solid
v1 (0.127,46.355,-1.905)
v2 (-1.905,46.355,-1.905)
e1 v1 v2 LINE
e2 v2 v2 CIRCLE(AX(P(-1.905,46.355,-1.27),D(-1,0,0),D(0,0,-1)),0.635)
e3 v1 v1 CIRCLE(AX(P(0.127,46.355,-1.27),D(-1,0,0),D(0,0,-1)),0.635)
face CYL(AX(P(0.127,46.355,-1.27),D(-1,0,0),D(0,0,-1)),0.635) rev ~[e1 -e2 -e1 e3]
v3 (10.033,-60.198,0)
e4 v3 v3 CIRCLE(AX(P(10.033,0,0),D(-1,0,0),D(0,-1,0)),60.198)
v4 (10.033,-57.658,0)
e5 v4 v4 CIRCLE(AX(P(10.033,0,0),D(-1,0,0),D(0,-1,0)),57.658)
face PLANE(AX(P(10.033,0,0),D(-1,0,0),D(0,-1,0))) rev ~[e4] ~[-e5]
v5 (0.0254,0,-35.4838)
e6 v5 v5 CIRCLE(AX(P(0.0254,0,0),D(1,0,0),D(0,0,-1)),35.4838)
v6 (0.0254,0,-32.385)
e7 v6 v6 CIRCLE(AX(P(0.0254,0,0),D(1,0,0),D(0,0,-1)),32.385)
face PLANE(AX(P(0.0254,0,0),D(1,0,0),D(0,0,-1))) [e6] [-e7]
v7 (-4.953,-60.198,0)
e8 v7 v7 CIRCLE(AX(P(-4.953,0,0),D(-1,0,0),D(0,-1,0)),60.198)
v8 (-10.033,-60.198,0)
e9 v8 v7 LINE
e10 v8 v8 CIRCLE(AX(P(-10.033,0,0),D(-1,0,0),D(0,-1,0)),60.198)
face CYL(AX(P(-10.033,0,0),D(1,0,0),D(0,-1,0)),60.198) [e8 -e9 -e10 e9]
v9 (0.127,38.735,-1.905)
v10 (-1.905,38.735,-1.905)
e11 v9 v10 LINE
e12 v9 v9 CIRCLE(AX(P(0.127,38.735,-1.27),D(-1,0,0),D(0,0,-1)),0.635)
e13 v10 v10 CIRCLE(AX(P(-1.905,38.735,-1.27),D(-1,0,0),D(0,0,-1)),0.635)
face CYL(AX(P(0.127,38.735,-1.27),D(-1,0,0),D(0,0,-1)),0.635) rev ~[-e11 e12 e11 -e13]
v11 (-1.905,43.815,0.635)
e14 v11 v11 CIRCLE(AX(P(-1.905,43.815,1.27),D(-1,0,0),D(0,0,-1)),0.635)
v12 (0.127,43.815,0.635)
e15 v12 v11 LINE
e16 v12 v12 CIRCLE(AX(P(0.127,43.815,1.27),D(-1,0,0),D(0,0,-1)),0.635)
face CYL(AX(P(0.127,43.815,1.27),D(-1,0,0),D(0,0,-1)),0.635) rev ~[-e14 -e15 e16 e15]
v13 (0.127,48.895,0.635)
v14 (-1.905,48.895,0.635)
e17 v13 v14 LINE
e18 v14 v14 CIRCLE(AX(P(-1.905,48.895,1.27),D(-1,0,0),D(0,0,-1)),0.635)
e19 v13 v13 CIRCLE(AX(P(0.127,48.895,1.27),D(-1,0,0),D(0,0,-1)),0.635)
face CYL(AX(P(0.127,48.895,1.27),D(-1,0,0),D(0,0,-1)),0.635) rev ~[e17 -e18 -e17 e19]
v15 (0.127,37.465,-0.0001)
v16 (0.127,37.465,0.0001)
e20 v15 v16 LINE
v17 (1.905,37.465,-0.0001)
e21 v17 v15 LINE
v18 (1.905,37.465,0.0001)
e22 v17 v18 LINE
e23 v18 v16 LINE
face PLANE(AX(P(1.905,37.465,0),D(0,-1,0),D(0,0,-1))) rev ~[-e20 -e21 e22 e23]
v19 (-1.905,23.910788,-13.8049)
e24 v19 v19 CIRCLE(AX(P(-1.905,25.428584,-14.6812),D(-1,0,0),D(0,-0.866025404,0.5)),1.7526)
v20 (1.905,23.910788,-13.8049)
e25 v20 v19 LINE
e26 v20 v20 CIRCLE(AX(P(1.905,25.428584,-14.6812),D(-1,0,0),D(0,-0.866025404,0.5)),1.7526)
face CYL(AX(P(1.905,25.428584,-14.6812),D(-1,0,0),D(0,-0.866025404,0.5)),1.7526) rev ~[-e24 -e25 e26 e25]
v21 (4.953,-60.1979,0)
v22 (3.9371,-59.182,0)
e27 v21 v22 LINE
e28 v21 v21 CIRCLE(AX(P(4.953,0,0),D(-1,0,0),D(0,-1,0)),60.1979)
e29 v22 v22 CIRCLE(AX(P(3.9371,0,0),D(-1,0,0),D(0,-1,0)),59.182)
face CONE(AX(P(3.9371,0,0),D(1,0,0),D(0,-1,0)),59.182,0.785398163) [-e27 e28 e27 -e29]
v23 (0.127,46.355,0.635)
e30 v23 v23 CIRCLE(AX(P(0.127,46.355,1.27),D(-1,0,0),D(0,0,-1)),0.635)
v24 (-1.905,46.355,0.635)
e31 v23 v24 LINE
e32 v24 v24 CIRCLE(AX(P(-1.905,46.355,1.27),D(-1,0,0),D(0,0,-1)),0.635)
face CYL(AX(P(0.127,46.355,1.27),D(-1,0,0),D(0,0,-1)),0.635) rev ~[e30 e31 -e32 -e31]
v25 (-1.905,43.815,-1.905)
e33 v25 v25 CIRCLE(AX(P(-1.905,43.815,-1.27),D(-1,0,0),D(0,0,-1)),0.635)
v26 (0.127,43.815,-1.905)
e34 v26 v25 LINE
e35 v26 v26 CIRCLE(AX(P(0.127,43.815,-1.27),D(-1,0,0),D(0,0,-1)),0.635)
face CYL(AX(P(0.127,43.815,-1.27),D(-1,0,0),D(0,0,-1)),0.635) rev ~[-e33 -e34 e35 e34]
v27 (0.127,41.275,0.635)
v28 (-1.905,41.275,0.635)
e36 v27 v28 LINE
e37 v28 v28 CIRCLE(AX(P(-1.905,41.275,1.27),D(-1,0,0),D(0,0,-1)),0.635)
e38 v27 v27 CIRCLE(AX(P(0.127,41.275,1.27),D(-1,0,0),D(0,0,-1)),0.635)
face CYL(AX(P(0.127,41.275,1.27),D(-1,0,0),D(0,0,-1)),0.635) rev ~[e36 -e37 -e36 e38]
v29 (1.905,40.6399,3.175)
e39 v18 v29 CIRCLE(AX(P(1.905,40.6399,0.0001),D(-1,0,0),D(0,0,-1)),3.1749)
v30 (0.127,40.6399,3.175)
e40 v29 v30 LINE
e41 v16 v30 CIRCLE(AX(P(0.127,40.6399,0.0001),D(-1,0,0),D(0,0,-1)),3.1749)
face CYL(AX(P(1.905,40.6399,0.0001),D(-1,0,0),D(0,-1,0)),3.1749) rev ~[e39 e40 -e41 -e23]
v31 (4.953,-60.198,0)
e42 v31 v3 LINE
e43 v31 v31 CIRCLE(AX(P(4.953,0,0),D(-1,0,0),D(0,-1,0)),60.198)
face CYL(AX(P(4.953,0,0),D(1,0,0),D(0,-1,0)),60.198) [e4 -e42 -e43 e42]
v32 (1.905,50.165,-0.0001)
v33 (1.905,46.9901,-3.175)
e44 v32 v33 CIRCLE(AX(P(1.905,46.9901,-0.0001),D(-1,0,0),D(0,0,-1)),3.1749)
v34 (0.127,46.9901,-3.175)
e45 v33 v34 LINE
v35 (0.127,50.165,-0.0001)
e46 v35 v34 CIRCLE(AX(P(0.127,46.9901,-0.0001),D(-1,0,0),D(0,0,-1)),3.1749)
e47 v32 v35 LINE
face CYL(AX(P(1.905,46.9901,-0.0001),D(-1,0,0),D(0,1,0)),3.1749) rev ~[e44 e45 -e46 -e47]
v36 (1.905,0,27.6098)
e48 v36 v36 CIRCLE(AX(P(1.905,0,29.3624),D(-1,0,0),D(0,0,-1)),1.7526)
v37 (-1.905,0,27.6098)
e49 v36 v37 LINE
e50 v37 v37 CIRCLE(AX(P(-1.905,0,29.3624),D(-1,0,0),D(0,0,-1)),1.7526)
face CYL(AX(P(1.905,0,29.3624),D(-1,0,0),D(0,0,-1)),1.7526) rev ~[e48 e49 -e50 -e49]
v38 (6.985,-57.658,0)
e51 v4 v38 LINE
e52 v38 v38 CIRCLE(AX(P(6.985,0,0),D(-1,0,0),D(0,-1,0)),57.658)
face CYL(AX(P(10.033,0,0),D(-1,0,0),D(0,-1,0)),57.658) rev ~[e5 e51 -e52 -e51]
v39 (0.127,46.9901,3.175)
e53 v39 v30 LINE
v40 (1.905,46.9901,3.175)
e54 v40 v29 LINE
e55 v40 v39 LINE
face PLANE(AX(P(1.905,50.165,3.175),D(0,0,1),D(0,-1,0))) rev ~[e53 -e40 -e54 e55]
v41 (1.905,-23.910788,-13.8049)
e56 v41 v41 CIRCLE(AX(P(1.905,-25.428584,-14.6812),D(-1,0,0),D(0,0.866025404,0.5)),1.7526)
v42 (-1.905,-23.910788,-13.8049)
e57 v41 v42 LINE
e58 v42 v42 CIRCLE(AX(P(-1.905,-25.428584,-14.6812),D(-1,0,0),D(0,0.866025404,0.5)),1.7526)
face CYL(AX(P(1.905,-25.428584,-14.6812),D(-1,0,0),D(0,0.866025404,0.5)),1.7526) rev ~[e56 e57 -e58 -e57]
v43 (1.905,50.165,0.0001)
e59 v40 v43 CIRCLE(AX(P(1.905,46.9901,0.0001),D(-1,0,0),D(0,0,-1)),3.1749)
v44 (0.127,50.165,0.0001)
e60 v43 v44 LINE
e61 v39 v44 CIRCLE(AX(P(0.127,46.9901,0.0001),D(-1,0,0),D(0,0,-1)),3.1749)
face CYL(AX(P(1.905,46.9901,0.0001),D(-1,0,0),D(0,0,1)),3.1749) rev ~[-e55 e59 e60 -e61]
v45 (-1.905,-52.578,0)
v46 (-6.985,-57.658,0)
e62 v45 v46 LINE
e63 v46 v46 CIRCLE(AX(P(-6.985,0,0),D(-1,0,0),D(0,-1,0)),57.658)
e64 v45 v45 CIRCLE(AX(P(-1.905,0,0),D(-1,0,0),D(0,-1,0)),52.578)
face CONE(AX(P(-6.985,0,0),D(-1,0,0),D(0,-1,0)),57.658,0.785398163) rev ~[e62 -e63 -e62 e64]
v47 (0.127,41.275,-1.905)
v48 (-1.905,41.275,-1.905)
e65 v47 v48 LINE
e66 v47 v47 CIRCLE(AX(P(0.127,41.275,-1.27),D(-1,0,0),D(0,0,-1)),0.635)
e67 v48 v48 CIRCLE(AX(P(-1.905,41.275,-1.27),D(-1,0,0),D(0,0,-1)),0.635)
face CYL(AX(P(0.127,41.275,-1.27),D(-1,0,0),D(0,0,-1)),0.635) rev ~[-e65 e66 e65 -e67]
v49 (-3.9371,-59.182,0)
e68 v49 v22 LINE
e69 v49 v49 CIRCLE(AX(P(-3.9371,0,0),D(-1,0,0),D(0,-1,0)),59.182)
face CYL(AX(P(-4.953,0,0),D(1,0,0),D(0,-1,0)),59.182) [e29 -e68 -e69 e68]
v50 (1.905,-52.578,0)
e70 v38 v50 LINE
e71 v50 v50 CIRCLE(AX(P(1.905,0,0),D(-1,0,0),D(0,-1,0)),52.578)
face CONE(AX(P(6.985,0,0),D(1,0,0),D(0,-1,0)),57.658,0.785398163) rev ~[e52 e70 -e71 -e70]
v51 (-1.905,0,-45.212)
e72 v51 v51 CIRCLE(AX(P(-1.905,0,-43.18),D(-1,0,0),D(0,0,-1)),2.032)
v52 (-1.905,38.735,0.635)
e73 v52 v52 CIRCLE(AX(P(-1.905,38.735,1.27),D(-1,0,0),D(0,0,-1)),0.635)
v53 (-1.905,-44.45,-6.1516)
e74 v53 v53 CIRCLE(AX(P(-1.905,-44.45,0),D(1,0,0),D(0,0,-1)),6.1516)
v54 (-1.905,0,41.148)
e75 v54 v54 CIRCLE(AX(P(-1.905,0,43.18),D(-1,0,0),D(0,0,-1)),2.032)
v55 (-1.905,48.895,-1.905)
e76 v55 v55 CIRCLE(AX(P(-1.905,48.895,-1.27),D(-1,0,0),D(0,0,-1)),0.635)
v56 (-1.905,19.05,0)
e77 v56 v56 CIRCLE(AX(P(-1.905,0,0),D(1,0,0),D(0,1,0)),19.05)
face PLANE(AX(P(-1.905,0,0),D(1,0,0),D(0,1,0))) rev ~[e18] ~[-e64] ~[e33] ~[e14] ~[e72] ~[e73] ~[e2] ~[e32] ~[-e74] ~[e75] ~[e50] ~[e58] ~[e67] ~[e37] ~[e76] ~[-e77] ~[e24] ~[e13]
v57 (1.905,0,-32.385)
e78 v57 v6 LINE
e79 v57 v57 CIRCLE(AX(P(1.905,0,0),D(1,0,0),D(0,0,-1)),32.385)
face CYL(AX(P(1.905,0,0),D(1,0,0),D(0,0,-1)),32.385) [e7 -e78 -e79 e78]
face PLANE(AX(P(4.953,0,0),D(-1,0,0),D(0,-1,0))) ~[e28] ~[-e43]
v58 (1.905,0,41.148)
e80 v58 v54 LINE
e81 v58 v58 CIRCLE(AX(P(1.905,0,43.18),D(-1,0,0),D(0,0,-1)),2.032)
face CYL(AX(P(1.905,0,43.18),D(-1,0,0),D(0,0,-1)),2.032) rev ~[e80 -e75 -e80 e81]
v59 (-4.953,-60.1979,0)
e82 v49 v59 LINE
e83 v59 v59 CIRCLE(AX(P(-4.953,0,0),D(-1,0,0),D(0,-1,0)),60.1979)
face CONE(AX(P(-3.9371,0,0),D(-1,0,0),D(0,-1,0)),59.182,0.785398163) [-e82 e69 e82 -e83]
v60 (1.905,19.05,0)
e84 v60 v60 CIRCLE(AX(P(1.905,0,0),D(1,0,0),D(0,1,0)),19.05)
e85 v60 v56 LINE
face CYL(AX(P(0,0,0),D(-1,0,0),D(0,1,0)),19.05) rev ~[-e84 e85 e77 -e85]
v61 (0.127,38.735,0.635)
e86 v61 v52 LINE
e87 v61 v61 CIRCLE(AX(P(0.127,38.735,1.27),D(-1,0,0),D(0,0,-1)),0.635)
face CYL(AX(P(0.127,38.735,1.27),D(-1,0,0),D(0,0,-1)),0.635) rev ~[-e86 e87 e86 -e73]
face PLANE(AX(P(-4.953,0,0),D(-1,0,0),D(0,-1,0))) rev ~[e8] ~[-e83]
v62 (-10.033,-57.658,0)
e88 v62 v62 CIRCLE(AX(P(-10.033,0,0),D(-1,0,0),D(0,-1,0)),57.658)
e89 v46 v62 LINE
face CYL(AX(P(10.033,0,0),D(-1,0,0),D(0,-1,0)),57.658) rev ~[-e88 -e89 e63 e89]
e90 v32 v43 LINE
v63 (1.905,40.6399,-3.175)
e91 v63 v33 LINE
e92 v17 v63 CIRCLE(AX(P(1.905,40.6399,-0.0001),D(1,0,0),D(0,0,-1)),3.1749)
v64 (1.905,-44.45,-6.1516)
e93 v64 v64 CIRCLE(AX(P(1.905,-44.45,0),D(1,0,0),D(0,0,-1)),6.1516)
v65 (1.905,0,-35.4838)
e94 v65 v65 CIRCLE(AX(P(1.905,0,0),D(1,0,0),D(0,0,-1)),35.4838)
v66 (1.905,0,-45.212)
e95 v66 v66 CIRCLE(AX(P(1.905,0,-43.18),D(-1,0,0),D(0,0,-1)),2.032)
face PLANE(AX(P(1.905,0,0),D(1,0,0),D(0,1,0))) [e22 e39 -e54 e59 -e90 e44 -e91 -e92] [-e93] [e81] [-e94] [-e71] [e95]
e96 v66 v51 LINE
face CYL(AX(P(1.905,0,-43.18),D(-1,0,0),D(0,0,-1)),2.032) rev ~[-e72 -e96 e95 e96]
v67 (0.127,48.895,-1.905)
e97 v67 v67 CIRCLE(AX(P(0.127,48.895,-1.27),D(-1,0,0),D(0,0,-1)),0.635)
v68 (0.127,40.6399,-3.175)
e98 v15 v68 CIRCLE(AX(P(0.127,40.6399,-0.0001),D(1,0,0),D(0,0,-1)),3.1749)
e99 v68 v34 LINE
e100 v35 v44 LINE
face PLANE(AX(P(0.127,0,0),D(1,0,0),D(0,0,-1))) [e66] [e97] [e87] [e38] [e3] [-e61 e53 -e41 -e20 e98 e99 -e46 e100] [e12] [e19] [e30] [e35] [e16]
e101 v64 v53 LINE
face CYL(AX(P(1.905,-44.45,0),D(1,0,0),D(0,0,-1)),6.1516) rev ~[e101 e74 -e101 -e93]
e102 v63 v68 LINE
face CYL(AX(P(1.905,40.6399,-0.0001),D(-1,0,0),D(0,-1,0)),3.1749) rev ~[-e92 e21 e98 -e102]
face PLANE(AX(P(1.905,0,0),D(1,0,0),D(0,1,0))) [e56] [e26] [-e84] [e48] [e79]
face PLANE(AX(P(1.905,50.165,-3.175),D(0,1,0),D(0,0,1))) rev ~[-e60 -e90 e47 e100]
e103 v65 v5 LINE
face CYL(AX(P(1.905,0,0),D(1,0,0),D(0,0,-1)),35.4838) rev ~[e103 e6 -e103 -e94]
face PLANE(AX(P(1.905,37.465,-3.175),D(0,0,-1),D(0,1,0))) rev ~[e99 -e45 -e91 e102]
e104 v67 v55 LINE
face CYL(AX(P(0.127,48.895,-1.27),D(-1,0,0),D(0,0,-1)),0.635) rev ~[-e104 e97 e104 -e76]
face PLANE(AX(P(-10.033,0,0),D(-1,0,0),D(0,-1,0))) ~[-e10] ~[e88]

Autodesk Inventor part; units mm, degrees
ref_plane "YZ Plane" through (0, 0, 0) normal (1, 0, 0) x (0, 1, 0)
ref_plane "XZ Plane" through (0, 0, 0) normal (0, 1, 0) x (-1, 0, 0)
ref_plane "XY Plane" through (0, 0, 0) normal (0, 0, 1) x (1, 0, 0)
sketch "Sketch1" plane through (0, 0, 0) normal (0, 0, 1) x (1, 0, 0)
  line L0 (0, 0) -> (-10.033, 0)
  line L1 (-10.033, 0) -> (-10.033, -60.198)
  line L2 (-10.033, -60.198) -> (-4.953, -60.198)
  line L3 (-4.953, -60.198) -> (-4.953, -59.182)
  line L4 (-4.953, -59.182) -> (4.953, -59.182)
  line L5 (4.953, -59.182) -> (4.953, -60.198)
  line L6 (4.953, -60.198) -> (10.033, -60.198)
  line L7 (10.033, -60.198) -> (10.033, -57.658)
  line L8 (10.033, -57.658) -> (-10.033, -57.658)
  dimension "d0" = 10.033
  dimension "d1" = 60.198
  dimension "d2" = 5.08
  dimension "d3" = 1.016
  dimension "d4" = 9.906
  dimension "d5" = 1.016
  dimension "d6" = 5.08
  dimension "d7" = 2.54
revolve "Revolution1" add sketch "Sketch1" angle 360 about axis through (0, 0, 0) along (-1, 0, 0)
chamfer "Chamfer1" distance 1.016 angle 45 2 edges at (-4.953, 59.182, 0) (4.953, 59.182, 0)
sketch "Sketch2" plane through (0, 0, 0) normal (1, 0, 0) x (0, 1, 0)
  circle A0 centre (0, 0) radius 59.182
  circle A1 centre (0, 0) radius 19.05
  dimension "d12" = 118.364
  dimension "d13" = 38.1
extrude "Extrusion1" add sketch "Sketch2" along normal mid plane 3.81
chamfer "Chamfer2" distance 5.08 angle 45 2 edges at (1.905, 57.658, 0) (-1.905, 57.658, 0)
sketch "Sketch3" plane through (1.905, 0, 0) normal (1, 0, 0) x (0, 0, -1)
  line L0 (0, 0) -> (-29.3624, 0)
  dimension "d19" = 29.3624
hole "Hole1" at (1.905, 0, 29.3624) direction (-1, 0, 0) diameter 3.5052 end through all
pattern_circular "Circular Pattern1" count 3 over 360 about axis through (0, 0, 0) along (1, 0, 0) of "Hole1"
sketch "Sketch4" plane through (1.905, 0, 0) normal (1, 0, 0) x (0, 0, -1)
  circle A0 centre (0, 0) radius 32.385
  circle A1 centre (0, 0) radius 35.4838
  dimension "d30" = 64.77
  dimension "d31" = 70.9676
extrude "Extrusion2" cut sketch "Sketch4" against normal blind 1.8796
sketch "Sketch5" plane through (1.905, 0, 0) normal (1, 0, 0) x (0, 0, -1)
  line L0 (0, 0) -> (43.18, 0)
  line L1 (0, 0) -> (0, 25.4)
  line L2 (0, 0) -> (-43.18, 0)
  dimension "d34" = 43.18
  dimension "d35" = 25.4
hole "Hole2" at (1.905, 0, 43.18) at (1.905, 0, -43.18) direction (-1, 0, 0) diameter 4.064 end through all
sketch "Sketch6" plane through (1.905, 0, 0) normal (1, 0, 0) x (0, 0, -1)
  circle A0 centre (0, 0) radius 36.195
  line L0 (0, 36.195) -> (0, 37.465)
  line L1 (0, 37.465) -> (-3.175, 37.465)
  line L2 (-3.175, 37.465) -> (3.175, 37.465)
  line L3 (3.175, 37.465) -> (3.175, 50.165)
  line L4 (3.175, 50.165) -> (-3.175, 50.165)
  line L5 (-3.175, 50.165) -> (-3.175, 37.465)
  dimension "d43" = 72.39
  dimension "d44" = 1.27
  dimension "d45" = 3.175
  dimension "d46" = 6.35
  dimension "d47" = 12.7
extrude "Extrusion3" cut sketch "Sketch6" against normal blind 1.778 contours L1 L5 L4 L3 L2
sketch "Sketch7" plane through (0.127, 0, 0) normal (1, 0, 0) x (0, 0, -1)
  line L0 (3.175, 37.465) -> (-3.175, 37.465) projected
  line L1 (-3.175, 37.465) -> (-1.27, 37.465)
  line L2 (-1.27, 37.465) -> (-1.27, 38.735)
  line L3 (-1.27, 38.735) -> (-1.27, 41.275)
  line L4 (-1.27, 41.275) -> (-1.27, 43.815)
  line L5 (-1.27, 43.815) -> (-1.27, 46.355)
  line L6 (-1.27, 46.355) -> (-1.27, 48.895)
  line L7 (0, 37.465) -> (0, 50.165)
  line L8 (-3.175, 50.165) -> (3.175, 50.165) projected
  line L9 (1.27, 37.465) -> (1.27, 38.735)
  line L10 (1.27, 38.735) -> (1.27, 41.275)
  line L11 (1.27, 41.275) -> (1.27, 43.815)
  line L12 (1.27, 43.815) -> (1.27, 46.355)
  line L13 (1.27, 46.355) -> (1.27, 48.895)
  point P0 (0, 0)
  dimension "d50" = 1.905
  dimension "d51" = 1.27
  dimension "d52" = 2.54
  dimension "d53" = 2.54
  dimension "d54" = 2.54
  dimension "d55" = 2.54
  dimension "d56" = 12.7
hole "Hole3" at (0.127, 48.895, 1.27) at (0.127, 46.355, 1.27) at (0.127, 43.815, 1.27) at (0.127, 41.275, 1.27) at (0.127, 38.735, 1.27) at (0.127, 38.735, -1.27) at (0.127, 41.275, -1.27) at (0.127, 43.815, -1.27) at (0.127, 46.355, -1.27) at (0.127, 48.895, -1.27) direction (-1, 0, 0) diameter 1.27 end through all
fillet "Fillet1" radius 3.175 4 edges at (1.016, 37.465, -3.175) (1.016, 50.165, -3.175) (1.016, 50.165, 3.175) (1.016, 37.465, 3.175)
sketch "Sketch8" plane through (1.905, 0, 0) normal (1, 0, 0) x (0, 0, -1)
  circle A0 centre (0, -44.45) radius 6.1516
  point P0 (0, 0)
  dimension "d65" = 12.3031
  dimension "d66" = 44.45
extrude "Extrusion4" cut sketch "Sketch8" against normal blind 25.4
properties part number "Disc" material "Acetal Resin, Black"
